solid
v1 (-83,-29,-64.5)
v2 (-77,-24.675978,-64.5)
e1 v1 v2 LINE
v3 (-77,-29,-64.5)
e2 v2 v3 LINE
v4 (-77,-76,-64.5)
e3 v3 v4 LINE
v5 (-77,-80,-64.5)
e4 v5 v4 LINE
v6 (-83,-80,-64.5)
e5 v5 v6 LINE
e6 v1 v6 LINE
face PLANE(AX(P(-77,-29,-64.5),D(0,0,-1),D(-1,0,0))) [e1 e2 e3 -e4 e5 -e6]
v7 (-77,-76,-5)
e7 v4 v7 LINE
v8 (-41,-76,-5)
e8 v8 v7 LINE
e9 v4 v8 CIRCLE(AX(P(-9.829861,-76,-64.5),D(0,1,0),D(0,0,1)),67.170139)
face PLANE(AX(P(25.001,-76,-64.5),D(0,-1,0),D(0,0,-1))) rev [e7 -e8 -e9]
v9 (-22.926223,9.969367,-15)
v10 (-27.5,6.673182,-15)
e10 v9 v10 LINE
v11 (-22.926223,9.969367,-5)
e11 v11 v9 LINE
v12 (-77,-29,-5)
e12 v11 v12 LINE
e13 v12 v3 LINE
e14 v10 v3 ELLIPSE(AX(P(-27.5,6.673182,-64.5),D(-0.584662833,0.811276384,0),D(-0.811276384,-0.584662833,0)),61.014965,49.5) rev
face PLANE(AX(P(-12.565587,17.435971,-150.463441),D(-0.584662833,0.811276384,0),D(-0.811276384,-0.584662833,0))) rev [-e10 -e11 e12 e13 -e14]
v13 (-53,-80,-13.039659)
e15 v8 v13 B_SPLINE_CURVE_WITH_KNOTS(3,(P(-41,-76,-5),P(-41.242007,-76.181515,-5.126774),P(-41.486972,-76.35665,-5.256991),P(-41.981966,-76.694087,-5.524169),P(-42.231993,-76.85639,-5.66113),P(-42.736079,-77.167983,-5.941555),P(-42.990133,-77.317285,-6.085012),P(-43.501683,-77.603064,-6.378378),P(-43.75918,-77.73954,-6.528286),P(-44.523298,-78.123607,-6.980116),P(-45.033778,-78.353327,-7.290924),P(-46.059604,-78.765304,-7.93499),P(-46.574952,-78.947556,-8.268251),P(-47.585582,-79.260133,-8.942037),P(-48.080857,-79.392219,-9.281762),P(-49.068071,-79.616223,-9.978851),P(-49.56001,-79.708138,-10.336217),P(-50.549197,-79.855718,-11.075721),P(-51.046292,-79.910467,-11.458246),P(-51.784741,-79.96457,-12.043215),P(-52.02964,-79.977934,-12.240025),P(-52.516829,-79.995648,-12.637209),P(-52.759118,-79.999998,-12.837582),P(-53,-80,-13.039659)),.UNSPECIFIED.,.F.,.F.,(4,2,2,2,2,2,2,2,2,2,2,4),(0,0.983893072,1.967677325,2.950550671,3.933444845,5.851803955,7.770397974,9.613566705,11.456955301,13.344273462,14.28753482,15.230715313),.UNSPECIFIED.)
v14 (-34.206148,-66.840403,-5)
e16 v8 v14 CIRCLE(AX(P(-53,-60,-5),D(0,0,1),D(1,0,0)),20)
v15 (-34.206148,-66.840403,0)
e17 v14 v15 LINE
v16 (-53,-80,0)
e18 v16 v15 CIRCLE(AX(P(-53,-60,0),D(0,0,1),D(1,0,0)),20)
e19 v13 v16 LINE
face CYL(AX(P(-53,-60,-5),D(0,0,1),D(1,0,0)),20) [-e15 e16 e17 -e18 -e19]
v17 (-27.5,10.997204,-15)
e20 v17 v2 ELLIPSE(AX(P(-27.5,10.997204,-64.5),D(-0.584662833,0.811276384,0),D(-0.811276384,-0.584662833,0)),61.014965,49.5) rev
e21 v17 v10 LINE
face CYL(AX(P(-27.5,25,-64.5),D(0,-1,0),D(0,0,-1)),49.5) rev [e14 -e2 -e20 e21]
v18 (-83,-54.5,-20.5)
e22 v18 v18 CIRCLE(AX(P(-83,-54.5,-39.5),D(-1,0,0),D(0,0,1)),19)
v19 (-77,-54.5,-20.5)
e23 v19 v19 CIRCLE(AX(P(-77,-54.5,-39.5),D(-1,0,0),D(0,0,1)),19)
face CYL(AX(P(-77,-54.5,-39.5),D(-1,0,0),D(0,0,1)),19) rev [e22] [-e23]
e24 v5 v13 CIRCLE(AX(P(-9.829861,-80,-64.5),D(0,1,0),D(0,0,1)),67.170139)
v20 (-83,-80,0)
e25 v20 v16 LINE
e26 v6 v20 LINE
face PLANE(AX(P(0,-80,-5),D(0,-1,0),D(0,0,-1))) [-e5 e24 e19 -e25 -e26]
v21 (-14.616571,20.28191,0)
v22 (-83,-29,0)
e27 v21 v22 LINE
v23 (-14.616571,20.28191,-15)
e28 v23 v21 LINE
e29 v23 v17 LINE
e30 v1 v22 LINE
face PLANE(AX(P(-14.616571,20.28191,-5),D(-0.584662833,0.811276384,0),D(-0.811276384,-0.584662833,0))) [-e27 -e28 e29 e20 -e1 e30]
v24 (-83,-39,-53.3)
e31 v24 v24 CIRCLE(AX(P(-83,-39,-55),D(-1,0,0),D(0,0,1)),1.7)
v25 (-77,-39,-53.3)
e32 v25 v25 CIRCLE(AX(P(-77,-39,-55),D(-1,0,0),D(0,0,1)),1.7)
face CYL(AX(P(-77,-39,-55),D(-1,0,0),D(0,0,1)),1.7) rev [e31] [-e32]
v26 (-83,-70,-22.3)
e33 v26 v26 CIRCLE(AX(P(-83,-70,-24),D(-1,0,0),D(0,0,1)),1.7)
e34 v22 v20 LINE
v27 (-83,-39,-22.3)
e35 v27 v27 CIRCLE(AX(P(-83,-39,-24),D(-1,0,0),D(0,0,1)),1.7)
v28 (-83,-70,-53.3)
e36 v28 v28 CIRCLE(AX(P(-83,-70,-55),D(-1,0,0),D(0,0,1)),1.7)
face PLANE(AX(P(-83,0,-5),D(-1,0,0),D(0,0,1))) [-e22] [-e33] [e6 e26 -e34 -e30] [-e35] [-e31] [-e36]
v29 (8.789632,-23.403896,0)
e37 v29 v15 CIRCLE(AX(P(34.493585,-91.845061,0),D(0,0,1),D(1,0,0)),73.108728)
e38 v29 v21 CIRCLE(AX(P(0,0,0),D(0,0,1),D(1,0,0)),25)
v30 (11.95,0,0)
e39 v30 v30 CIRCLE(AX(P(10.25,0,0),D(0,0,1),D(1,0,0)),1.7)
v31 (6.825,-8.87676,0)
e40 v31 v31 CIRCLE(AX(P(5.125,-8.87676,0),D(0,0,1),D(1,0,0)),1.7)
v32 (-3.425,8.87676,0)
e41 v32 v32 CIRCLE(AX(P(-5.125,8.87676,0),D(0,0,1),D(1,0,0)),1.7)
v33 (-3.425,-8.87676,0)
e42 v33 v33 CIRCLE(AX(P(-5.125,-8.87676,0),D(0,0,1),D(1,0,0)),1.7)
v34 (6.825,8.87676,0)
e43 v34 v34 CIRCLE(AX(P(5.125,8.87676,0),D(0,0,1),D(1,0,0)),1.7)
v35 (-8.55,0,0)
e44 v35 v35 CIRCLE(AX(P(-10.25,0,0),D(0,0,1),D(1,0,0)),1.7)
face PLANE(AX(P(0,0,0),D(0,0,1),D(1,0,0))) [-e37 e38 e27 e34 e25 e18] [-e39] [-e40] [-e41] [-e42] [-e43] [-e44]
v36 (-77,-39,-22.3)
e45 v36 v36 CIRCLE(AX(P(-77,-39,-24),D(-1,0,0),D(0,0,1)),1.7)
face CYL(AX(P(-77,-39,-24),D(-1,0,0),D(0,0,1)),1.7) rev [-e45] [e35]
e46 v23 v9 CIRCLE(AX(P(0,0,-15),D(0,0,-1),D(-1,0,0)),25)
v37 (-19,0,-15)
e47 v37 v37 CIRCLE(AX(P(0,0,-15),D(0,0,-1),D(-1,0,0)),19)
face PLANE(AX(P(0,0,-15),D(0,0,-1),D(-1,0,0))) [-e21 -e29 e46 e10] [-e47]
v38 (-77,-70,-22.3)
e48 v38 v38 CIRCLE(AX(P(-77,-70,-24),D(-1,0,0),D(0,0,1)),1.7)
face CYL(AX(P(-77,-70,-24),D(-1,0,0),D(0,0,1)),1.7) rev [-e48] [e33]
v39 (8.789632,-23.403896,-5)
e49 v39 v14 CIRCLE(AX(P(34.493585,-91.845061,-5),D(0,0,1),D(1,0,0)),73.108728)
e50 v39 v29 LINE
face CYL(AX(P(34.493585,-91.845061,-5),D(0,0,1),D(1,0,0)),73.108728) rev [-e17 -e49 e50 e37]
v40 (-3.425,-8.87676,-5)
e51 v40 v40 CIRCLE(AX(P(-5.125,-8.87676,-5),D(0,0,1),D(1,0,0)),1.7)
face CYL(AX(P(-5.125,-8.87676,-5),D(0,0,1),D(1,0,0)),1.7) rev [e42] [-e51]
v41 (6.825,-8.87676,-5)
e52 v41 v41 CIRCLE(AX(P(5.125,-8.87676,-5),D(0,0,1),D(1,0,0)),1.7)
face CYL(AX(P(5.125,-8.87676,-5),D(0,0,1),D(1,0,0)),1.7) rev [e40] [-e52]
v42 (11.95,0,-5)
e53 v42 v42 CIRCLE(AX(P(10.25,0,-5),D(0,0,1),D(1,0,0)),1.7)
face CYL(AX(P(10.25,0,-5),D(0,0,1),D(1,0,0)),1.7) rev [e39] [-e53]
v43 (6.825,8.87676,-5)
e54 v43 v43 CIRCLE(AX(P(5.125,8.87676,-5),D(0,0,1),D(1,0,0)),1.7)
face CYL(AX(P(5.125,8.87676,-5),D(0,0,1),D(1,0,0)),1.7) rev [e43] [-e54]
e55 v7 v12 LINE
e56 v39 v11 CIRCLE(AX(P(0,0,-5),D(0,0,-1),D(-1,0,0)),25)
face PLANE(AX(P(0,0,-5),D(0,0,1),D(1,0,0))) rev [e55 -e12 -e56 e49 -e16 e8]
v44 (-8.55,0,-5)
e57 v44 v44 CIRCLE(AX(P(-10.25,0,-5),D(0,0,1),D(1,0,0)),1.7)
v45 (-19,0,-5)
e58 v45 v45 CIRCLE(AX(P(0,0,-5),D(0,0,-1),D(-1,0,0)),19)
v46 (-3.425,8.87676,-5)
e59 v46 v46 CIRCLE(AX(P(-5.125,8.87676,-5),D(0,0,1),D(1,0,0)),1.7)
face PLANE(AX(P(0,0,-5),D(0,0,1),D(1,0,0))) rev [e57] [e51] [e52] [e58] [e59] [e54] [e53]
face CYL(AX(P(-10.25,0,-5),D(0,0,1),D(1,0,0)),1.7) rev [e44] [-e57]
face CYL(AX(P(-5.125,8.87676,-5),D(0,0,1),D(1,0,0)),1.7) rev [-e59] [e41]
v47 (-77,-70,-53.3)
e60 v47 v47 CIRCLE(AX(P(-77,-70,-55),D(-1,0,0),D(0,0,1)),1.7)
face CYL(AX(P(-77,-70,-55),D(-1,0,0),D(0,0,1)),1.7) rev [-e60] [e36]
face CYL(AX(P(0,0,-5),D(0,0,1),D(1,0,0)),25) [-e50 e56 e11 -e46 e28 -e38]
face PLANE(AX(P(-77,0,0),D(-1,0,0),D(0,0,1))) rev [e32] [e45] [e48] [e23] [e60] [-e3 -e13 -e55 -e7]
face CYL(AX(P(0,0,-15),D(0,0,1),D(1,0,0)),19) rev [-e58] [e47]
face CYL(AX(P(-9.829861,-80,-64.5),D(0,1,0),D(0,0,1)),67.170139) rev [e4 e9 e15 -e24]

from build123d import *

# Parameters (mm, degrees)
SKIZZE1_R                        = 1.7
AUFSATZ_LINEAR_AUSTRAGEN1_DEPTH  = 5
SKIZZE14_R                       = 25
SKIZZE14_R_2                     = 19
AUFSATZ_LINEAR_AUSTRAGEN9_DEPTH  = 10
SKIZZE4_W                        = 59.5
SKIZZE4_H                        = 51
SKIZZE4_R                        = 1.7
SKIZZE4_R_2                      = 19
AUFSATZ_LINEAR_AUSTRAGEN4_DEPTH  = 6
AUFSATZ_LINEAR_START             = -64.5
AUFSATZ_LINEAR_AUSTRAGEN10_DEPTH = 59.5
AUFSATZ_LINEAR_AUSTRAGEN11_DEPTH = 59.5
SCHNITT_LINEAR_AUSTRAGEN4_DEPTH  = 146.774654862
SKIZZE19_R                       = 67.170138889
SCHNITT_LINEAR_AUSTRAGEN5_DEPTH  = 146.774654862


# Read off the part's stored shape, not the designer's step: Aufsatz-Linear austragen10
with BuildPart() as part:
    # Skizze1 → Aufsatz-Linear austragen1 (new body)
    with BuildSketch(Plane.XY):
        with BuildLine():
            Line((-83, -29), (-83, -80))
            Line((-83, -80), (-53, -80))
            ThreePointArc((-53, -80), (-41.528471273, -76.383040886), (-34.206147584, -66.840402867))
            ThreePointArc((-34.206147584, -66.840402867), (-17.465018587, -40.413653136), (8.789632026, -23.403896446))
            ThreePointArc((8.789632026, -23.403896446), (22.036349892, 11.806747369), (-14.616570826, 20.281909606))
            Line((-14.616570826, 20.281909606), (-83, -29))
        make_face()
        with Locations((10.25, 0)):
            Circle(SKIZZE1_R, mode=Mode.SUBTRACT)
        with Locations((5.125, -8.876760389)):
            Circle(SKIZZE1_R, mode=Mode.SUBTRACT)
        with Locations((-5.125, -8.876760389)):
            Circle(SKIZZE1_R, mode=Mode.SUBTRACT)
        with Locations((-10.25, 0)):
            Circle(SKIZZE1_R, mode=Mode.SUBTRACT)
        with Locations((-5.125, 8.876760389)):
            Circle(SKIZZE1_R, mode=Mode.SUBTRACT)
        with Locations((5.125, 8.876760389)):
            Circle(SKIZZE1_R, mode=Mode.SUBTRACT)
    extrude(amount=-AUFSATZ_LINEAR_AUSTRAGEN1_DEPTH)

    # Skizze14 → Aufsatz-Linear austragen9 (add)
    with BuildSketch(Plane(origin=(0, 0, -5), x_dir=(-1, 0, 0), z_dir=(0, 0, -1))):
        with Locations(Location((0, 0, 0), (0, 0, 249.415691324))):
            Circle(SKIZZE14_R)
        Circle(SKIZZE14_R_2, mode=Mode.SUBTRACT)
    extrude(amount=AUFSATZ_LINEAR_AUSTRAGEN9_DEPTH)

    # Skizze4 → Aufsatz-Linear austragen4 (add)
    with BuildSketch(Plane.ZY.offset(83)):
        with Locations((-34.75, -54.5)):
            Rectangle(SKIZZE4_W, SKIZZE4_H)
        with Locations((-24, -39)):
            Circle(SKIZZE4_R, mode=Mode.SUBTRACT)
        with Locations((-55, -39)):
            Circle(SKIZZE4_R, mode=Mode.SUBTRACT)
        with Locations((-55, -70)):
            Circle(SKIZZE4_R, mode=Mode.SUBTRACT)
        with Locations((-24, -70)):
            Circle(SKIZZE4_R, mode=Mode.SUBTRACT)
        with Locations((-39.5, -54.5)):
            Circle(SKIZZE4_R_2, mode=Mode.SUBTRACT)
    extrude(amount=-AUFSATZ_LINEAR_AUSTRAGEN4_DEPTH)

    # Aufsatz-Linear austragen10 outline → Aufsatz-Linear austragen10 (add)
    with BuildSketch(Plane.XY.offset(AUFSATZ_LINEAR_START)):
        with BuildLine():
            Line((-77, -76), (-77, -80))
            Line((-77, -80), (-53, -80))
            ThreePointArc((-53, -80), (-46.67544468, -78.973665961), (-41, -76))
            Line((-41, -76), (-77, -76))
        make_face()
    extrude(amount=AUFSATZ_LINEAR_AUSTRAGEN10_DEPTH)

    # Skizze16 → Aufsatz-Linear austragen11 (add)
    with BuildSketch(Plane(origin=(0, 0, -5), x_dir=(-1, 0, 0), z_dir=(0, 0, -1))):
        Polygon((83, -29), (14.616570826, 20.281909606), (12.565587056, 17.435970711), (77, -29), align=None)
    extrude(amount=AUFSATZ_LINEAR_AUSTRAGEN11_DEPTH)

    # Skizze18 → Schnitt-Linear austragen4 (cut, through all)
    with BuildSketch(Plane(origin=(0, -76, 0), x_dir=(1, 0, 0), z_dir=(0, 1, 0))):
        with BuildLine():
            Line((25, 15), (25, 103.581922368))
            Line((25, 103.581922368), (-57.878501345, 103.581922368))
            ThreePointArc((-57.878501345, 103.581922368), (-74.323098772, 48.442371863), (-27.5, 15))
            Line((-27.5, 15), (25, 15))
        make_face()
    extrude(amount=SCHNITT_LINEAR_AUSTRAGEN4_DEPTH, mode=Mode.SUBTRACT)

    # Skizze19 → Schnitt-Linear austragen5 (cut, through all)
    with BuildSketch(Plane(origin=(0, -76, 0), x_dir=(1, 0, 0), z_dir=(0, 1, 0))):
        with Locations((-9.829861111, 64.5)):
            Circle(SKIZZE19_R)
    extrude(amount=-SCHNITT_LINEAR_AUSTRAGEN5_DEPTH, mode=Mode.SUBTRACT)


solid = part.part
